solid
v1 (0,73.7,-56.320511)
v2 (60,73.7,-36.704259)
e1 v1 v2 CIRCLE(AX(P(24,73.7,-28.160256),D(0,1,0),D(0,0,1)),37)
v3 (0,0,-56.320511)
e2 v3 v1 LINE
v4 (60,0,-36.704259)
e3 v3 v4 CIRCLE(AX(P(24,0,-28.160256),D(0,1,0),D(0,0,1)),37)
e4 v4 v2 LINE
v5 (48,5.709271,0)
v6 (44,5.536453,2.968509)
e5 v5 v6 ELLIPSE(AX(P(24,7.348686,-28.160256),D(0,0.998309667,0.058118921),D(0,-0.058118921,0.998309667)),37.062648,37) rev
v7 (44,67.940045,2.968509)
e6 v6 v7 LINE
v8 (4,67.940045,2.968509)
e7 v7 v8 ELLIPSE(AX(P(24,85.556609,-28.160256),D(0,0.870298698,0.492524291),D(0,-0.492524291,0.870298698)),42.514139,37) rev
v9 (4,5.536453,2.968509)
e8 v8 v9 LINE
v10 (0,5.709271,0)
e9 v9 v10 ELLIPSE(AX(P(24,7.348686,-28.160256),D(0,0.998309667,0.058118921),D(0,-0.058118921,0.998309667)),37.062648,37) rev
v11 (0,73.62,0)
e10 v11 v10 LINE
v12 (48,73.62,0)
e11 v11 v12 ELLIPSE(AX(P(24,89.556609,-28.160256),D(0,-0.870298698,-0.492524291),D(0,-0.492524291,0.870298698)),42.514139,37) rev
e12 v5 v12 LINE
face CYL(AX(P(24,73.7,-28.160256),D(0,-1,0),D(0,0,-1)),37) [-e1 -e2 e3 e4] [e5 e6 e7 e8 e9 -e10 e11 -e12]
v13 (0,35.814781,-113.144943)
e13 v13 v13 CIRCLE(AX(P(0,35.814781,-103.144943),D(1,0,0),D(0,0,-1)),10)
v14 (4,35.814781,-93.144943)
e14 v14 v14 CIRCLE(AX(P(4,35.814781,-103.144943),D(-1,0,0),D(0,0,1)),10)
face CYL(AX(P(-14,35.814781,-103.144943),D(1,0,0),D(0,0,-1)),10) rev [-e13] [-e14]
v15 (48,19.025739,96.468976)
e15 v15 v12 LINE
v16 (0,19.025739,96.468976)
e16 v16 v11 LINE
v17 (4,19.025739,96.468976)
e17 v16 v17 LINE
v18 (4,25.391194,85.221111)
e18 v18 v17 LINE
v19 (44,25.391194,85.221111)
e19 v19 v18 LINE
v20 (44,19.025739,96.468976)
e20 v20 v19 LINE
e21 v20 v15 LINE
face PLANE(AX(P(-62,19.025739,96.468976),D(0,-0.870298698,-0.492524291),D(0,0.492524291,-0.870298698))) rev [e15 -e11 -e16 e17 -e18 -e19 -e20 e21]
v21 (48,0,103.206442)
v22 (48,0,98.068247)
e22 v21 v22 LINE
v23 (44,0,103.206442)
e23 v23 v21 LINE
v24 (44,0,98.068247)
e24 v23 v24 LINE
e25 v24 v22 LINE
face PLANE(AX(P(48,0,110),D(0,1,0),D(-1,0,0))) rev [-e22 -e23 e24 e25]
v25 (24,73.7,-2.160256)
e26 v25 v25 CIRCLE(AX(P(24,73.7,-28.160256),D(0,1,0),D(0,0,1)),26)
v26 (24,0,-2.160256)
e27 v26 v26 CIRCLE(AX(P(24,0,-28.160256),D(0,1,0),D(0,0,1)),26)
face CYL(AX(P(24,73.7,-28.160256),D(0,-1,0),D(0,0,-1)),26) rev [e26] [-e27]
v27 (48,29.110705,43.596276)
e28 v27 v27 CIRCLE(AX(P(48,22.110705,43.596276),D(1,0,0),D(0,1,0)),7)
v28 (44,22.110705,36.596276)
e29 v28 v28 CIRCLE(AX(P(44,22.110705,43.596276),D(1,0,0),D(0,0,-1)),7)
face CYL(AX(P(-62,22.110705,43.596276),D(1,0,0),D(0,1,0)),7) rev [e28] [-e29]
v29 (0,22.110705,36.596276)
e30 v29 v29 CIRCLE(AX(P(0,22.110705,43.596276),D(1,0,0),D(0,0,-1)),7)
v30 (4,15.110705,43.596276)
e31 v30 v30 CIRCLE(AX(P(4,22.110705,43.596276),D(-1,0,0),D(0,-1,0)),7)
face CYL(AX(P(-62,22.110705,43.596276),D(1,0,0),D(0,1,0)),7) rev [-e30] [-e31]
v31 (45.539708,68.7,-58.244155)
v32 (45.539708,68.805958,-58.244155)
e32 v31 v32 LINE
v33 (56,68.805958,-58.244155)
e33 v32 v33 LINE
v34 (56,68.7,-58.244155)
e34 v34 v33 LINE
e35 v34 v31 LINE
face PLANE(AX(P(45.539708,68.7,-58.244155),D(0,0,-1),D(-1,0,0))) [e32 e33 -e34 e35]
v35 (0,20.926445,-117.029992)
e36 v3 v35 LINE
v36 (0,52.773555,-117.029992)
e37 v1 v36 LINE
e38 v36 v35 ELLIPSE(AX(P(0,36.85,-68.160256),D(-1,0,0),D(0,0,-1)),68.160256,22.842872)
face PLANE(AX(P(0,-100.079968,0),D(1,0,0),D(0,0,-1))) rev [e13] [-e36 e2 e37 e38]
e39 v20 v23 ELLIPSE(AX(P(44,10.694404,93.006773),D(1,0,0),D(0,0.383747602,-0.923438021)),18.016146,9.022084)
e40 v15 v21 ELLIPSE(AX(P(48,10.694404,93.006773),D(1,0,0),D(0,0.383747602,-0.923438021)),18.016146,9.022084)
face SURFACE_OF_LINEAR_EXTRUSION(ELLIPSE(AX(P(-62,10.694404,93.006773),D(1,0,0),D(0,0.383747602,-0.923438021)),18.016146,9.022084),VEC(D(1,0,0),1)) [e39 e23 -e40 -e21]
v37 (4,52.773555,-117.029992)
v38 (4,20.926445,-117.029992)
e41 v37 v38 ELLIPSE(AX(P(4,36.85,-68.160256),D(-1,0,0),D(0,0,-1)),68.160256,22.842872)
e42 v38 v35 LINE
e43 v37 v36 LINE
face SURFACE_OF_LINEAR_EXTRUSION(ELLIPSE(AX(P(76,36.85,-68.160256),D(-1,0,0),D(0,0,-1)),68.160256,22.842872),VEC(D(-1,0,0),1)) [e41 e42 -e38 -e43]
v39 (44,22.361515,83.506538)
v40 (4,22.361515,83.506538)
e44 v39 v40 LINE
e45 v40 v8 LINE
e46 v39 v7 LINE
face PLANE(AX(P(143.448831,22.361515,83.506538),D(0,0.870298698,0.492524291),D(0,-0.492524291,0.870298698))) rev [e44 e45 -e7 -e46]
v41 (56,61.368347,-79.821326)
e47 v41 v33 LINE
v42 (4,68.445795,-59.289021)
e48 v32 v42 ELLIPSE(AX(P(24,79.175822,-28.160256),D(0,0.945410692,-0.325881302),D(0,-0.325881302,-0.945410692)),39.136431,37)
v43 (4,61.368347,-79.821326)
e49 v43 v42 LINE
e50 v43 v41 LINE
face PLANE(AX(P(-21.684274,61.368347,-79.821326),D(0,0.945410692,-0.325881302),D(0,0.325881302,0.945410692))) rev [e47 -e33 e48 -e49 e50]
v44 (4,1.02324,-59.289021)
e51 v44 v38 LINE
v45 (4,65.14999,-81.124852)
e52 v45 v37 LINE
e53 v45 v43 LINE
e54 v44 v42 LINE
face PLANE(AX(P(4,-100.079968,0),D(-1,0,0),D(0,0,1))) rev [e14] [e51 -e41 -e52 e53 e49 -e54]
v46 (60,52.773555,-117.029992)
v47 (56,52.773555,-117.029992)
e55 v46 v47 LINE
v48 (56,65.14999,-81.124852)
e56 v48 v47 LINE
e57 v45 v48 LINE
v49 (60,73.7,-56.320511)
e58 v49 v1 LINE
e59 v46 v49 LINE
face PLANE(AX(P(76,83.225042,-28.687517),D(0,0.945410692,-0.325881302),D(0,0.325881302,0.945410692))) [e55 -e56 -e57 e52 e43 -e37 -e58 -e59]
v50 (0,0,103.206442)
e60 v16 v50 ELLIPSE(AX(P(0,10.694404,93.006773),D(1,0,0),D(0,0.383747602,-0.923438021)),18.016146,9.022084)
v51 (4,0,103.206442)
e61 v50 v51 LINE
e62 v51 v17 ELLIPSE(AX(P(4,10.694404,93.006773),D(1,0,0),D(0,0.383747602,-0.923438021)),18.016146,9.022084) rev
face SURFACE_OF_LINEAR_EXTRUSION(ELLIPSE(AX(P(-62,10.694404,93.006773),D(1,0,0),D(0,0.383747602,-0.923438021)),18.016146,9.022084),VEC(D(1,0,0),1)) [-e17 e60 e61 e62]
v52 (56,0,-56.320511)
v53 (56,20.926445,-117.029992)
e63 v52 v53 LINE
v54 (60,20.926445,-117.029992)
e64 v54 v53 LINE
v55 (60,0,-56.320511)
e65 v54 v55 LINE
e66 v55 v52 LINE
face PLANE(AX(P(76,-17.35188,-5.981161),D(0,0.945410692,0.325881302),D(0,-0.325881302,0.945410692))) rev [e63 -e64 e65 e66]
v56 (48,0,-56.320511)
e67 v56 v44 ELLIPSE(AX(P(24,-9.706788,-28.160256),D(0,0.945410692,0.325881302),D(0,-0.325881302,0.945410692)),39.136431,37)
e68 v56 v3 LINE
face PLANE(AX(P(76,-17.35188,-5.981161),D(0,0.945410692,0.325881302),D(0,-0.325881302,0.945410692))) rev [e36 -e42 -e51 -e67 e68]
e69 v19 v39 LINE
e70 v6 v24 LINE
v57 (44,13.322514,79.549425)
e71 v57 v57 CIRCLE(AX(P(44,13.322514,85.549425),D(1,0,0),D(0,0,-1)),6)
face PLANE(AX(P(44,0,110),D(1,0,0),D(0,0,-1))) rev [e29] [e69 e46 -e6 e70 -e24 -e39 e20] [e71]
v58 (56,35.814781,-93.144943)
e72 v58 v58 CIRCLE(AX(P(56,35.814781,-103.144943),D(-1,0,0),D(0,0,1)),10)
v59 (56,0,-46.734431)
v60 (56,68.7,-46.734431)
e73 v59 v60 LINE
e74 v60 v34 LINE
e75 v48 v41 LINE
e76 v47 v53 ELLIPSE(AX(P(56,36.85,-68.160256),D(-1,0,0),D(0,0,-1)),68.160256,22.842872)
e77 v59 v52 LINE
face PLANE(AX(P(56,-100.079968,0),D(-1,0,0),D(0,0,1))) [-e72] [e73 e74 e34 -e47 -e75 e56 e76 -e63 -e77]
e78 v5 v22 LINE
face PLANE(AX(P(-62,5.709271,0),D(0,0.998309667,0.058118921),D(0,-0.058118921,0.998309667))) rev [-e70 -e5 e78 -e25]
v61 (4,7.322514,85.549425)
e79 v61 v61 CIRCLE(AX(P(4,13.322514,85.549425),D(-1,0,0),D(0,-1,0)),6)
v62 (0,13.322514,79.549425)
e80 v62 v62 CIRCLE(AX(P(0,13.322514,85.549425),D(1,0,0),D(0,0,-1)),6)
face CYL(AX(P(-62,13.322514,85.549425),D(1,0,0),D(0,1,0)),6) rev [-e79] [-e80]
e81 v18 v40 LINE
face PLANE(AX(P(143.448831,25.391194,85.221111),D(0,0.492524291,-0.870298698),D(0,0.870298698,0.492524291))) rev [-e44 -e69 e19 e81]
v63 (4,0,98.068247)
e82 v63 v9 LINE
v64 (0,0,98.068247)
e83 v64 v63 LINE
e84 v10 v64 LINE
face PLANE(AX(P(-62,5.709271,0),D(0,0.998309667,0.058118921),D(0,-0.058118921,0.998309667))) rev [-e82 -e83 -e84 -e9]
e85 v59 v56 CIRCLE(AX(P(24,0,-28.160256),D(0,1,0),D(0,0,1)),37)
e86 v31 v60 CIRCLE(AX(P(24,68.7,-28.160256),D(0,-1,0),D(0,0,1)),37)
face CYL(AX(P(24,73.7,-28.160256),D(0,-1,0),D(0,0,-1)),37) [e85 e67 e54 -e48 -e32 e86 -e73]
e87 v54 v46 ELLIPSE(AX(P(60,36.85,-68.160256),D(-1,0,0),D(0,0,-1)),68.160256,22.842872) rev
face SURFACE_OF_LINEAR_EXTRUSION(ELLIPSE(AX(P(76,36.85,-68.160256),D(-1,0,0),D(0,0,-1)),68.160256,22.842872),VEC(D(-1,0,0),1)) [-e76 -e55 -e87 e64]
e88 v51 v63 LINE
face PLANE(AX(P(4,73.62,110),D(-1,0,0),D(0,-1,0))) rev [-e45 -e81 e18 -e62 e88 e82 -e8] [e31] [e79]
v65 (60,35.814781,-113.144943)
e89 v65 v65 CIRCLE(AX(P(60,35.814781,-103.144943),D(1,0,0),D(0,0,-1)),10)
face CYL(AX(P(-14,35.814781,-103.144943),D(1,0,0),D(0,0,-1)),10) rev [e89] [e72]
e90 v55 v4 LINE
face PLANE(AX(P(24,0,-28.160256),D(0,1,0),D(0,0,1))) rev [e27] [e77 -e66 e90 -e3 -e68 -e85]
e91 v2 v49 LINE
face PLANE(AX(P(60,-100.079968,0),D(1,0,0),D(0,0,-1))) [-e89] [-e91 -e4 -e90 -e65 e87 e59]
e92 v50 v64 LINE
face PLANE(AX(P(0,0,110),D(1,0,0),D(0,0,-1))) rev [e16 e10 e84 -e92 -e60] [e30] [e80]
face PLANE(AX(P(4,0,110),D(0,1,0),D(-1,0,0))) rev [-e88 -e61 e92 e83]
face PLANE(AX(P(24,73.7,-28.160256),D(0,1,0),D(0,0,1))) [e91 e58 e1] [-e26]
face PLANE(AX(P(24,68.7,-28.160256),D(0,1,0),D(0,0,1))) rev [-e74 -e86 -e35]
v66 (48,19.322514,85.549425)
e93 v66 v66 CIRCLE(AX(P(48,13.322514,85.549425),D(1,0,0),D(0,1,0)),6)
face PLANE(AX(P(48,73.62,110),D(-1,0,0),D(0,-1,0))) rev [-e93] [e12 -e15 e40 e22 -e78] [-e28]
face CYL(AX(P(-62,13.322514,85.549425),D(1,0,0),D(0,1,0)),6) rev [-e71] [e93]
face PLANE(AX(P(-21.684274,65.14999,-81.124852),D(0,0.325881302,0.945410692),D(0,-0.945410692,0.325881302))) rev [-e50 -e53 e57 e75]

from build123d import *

# Parameters (mm, degrees)
SKETCH3_W                = 4
SKETCH3_H                = 73.62
BOSS_EXTRUDE2_DEPTH      = 110
BOSS_EXTRUDE2_2_DEPTH    = 110
SKETCH4_OUTSIDE_W        = 140.16
SKETCH4_OUTSIDE_H        = 103.78
CUT_EXTRUDE1_DEPTH       = 110
BOSS_EXTRUDE3_DEPTH      = 40
SKETCH6_R                = 7
SKETCH6_R_2              = 6
CUT_EXTRUDE2_DEPTH       = 110
SKETCH7_R                = 37
SKETCH7_R_2              = 26
BOSS_EXTRUDE4_DEPTH      = 73.7
BOSS_EXTRUDE6_START      = -73.7
BOSS_EXTRUDE6_DEPTH      = 73.7
CUT_EXTRUDE9_START       = -60
CUT_EXTRUDE9_DEPTH       = 60
SKETCH15_R               = 10
CUT_EXTRUDE11_DEPTH      = 74
BOSS_EXTRUDE8_REACH      = 171.943
CUT_EXTRUDE12_DEPTH      = 172.60636515
CUT_EXTRUDE12_DEPTH_BACK = 172.60636515
SKETCH18_W               = 0.383748065
SKETCH18_H               = 73.7
BOSS_EXTRUDE9_START      = -5
BOSS_EXTRUDE9_DEPTH      = 5
CUT_EXTRUDE13_DEPTH      = 50


# Read off the part's stored shape, not the designer's step: Cut-Extrude9
with BuildPart() as part:
    # Sketch3 → Boss-Extrude2 (new body)
    with BuildSketch(Plane.XY):
        with Locations((2, 36.81)):
            Rectangle(SKETCH3_W, SKETCH3_H)
    extrude(amount=BOSS_EXTRUDE2_DEPTH)


with BuildPart() as body_2:
    # Sketch3 → Boss-Extrude2 2 (new body)
    with BuildSketch(Plane.XY):
        with Locations((46, 36.81)):
            Rectangle(SKETCH3_W, SKETCH3_H)
    extrude(amount=BOSS_EXTRUDE2_2_DEPTH)


with BuildPart() as cut_extrude1_tool:
    # Sketch4 outside → Cut-Extrude1 (new body)
    with BuildSketch(Plane(origin=(48, 0, 0), x_dir=(0, 0, -1), z_dir=(1, 0, 0))):
        with Locations((-55, 36.81)):
            Rectangle(SKETCH4_OUTSIDE_W, SKETCH4_OUTSIDE_H)
        with BuildLine():
            Line((0, 5.709271206), (-99.676636629, -0.093636173))
            add(Edge.make_bspline(
                [(-96.468976077, 19.025739265), (-149.450115124, -2.991315062), (-99.676636629, -0.093636173)],
                knots=[1.570796327, 1.570796327, 1.570796327, 4.103862701, 4.103862701, 4.103862701], degree=2, weights=[1, 0.299590242, 1]))
            Line((-96.468976077, 19.025739265), (0, 73.62))
            Line((0, 73.62), (0, 5.709271206))
        make_face(mode=Mode.SUBTRACT)
    extrude(amount=-CUT_EXTRUDE1_DEPTH)


with BuildPart() as part_1:
    add(part.part)

    # Cut-Extrude1: cut by cut_extrude1_tool
    add(cut_extrude1_tool.part, mode=Mode.SUBTRACT)



with BuildPart() as body_2_1:
    add(body_2.part)

    # Cut-Extrude1: cut by cut_extrude1_tool
    add(cut_extrude1_tool.part, mode=Mode.SUBTRACT)


with BuildPart() as part_2:
    add(part_1.part)

    add(body_2_1.part)  # Boss-Extrude3 merges body 2
    # Sketch5 → Boss-Extrude3 (add)
    with BuildSketch(Plane(origin=(4, 0, 0), x_dir=(0, 0, -1), z_dir=(1, 0, 0))):
        Polygon((0, 73.62), (-85.221110514, 25.391194049), (-83.506537519, 22.361514757), (0, 69.62), align=None)
    extrude(amount=BOSS_EXTRUDE3_DEPTH)

    # Sketch6 → Cut-Extrude2 (cut)
    with BuildSketch(Plane(origin=(48, 0, 0), x_dir=(0, 0, -1), z_dir=(1, 0, 0))):
        with Locations(Location((-43.596276135, 22.110704559, 0), (0, 0, 90))):
            Circle(SKETCH6_R)
        with Locations(Location((-85.5494254, 13.322513691, 0), (0, 0, 90))):
            Circle(SKETCH6_R_2)
    extrude(amount=-CUT_EXTRUDE2_DEPTH, mode=Mode.SUBTRACT)

    # Sketch7 → Boss-Extrude4 (add)
    with BuildSketch(Plane(origin=(0, 0, 0), x_dir=(1, 0, 0), z_dir=(0, 1, 0))):
        with Locations(Location((24, 28.160255681, 0), (0, 0, 270))):
            Circle(SKETCH7_R)
        with Locations(Location((24, 28.160255681, 0), (0, 0, 270))):
            Circle(SKETCH7_R_2, mode=Mode.SUBTRACT)
    extrude(amount=BOSS_EXTRUDE4_DEPTH)

    # Sketch9 → Boss-Extrude6 (add)
    with BuildSketch(Plane(origin=(0, 73.7, 0), x_dir=(1, 0, 0), z_dir=(0, 1, 0)).offset(BOSS_EXTRUDE6_START)):
        with BuildLine():
            ThreePointArc((56, 46.734431302), (58.367878709, 41.866054199), (60, 36.704259426))
            Line((60, 36.704259426), (60, 136.704259426))
            Line((60, 136.704259426), (56, 136.704259426))
            Line((56, 136.704259426), (56, 46.734431302))
        make_face()
        with BuildLine():
            Line((0, 136.320511361), (0, 56.320511361))
            ThreePointArc((0, 56.320511361), (1.949988398, 57.872155458), (4, 59.289020513))
            Line((4, 59.289020513), (4, 136.320511361))
            Line((4, 136.320511361), (0, 136.320511361))
        make_face()
    extrude(amount=BOSS_EXTRUDE6_DEPTH)

    # Cut-Extrude9 outline → Cut-Extrude9 (cut)
    with BuildSketch(Plane.ZY.offset(CUT_EXTRUDE9_START)):
        with BuildLine():
            add(Edge.make_bspline(
                [(-136.320511361, 36.85), (-136.320511361, 27.575850811), (-117.029991726, 20.926444667)],
                knots=[6.283185307, 6.283185307, 6.283185307, 7.054517173, 7.054517173, 7.054517173], degree=2, weights=[0.858491437, 0.858491437, 1]))
            Line((-136.320511361, 36.85), (-136.320511361, 0))
            Line((-136.320511361, 0), (-56.320511361, 0))
            Line((-56.320511361, 0), (-117.029991726, 20.926444667))
        make_face()
        with BuildLine():
            add(Edge.make_bspline(
                [(-117.029991726, 52.773555333), (-136.320511361, 46.124149189), (-136.320511361, 36.85)],
                knots=[5.511853442, 5.511853442, 5.511853442, 6.283185307, 6.283185307, 6.283185307], degree=2, weights=[1, 0.858491437, 0.858491437]))
            Line((-117.029991726, 52.773555333), (-56.320511361, 73.7))
            Line((-56.320511361, 73.7), (-136.320511361, 73.7))
            Line((-136.320511361, 73.7), (-136.320511361, 36.85))
        make_face()
    extrude(amount=CUT_EXTRUDE9_DEPTH, mode=Mode.SUBTRACT)

    # Sketch15 → Cut-Extrude11 (cut)
    with BuildSketch(Plane(origin=(60, 0, 0), x_dir=(0, 0, -1), z_dir=(1, 0, 0))):
        with Locations((103.144942626, 35.814780524)):
            Circle(SKETCH15_R)
    extrude(amount=-CUT_EXTRUDE11_DEPTH, mode=Mode.SUBTRACT)

    # Boss-Extrude8: up to this face of the body (flat: up to its plane)
    boss_extrude8_end = Plane(part_2.part.faces().sort_by_distance((4, 36.955026581, -88.076596364))[0])
    # Sketch16 → Boss-Extrude8 (add, up to the picked face)
    with BuildSketch(Plane.ZY.offset(-56), mode=Mode.PRIVATE) as boss_extrude8_sk1:
        Polygon((-58.244155034, 73.036923613), (-81.124851518, 65.149990205), (-79.821326308, 61.368347436), (-58.244155034, 68.805958136), align=None)
    boss_extrude8_tool1 = split(extrude(boss_extrude8_sk1.sketch, amount=BOSS_EXTRUDE8_REACH, mode=Mode.PRIVATE), bisect_by=boss_extrude8_end, keep=Keep.BOTH, mode=Mode.PRIVATE)
    add(boss_extrude8_tool1.solids().sort_by(Axis((56, 67.109883, -69.361807), (-1, 0, 0)))[0])

    # Sketch18 → Cut-Extrude12 (cut, two sides: drawn at the far end of the back side and taken through both)
    with BuildSketch(Plane(origin=(60, 0, 0), x_dir=(0, 0, -1), z_dir=(1, 0, 0)).offset(-CUT_EXTRUDE12_DEPTH_BACK)):
        with Locations((136.512385394, 36.85)):
            Rectangle(SKETCH18_W, SKETCH18_H)
    extrude(amount=CUT_EXTRUDE12_DEPTH + CUT_EXTRUDE12_DEPTH_BACK, mode=Mode.SUBTRACT)

    # Sketch19 → Boss-Extrude9 (add)
    with BuildSketch(Plane(origin=(0, 73.7, 0), x_dir=(1, 0, 0), z_dir=(0, 1, 0)).offset(BOSS_EXTRUDE9_START)):
        with BuildLine():
            Line((56, 56.320511361), (56, 58.244155034))
            Line((56, 58.244155034), (45.539707511, 58.244155034))
            ThreePointArc((45.539707511, 58.244155034), (46.79015887, 57.308302934), (48, 56.320511361))
            ThreePointArc((48, 56.320511361), (52.407274292, 51.867359411), (56, 46.734431302))
            Line((56, 46.734431302), (56, 56.320511361))
        make_face()
    extrude(amount=BOSS_EXTRUDE9_DEPTH)

    # Sketch20 → Cut-Extrude13 (cut)
    with BuildSketch(Plane(origin=(60, 0, 0), x_dir=(0, 0, -1), z_dir=(1, 0, 0))):
        Polygon((58.244155034, 73.036923613), (58.244155034, 73.7), (56.320511361, 73.7), align=None)
    extrude(amount=-CUT_EXTRUDE13_DEPTH, mode=Mode.SUBTRACT)


solid = part_2.part
